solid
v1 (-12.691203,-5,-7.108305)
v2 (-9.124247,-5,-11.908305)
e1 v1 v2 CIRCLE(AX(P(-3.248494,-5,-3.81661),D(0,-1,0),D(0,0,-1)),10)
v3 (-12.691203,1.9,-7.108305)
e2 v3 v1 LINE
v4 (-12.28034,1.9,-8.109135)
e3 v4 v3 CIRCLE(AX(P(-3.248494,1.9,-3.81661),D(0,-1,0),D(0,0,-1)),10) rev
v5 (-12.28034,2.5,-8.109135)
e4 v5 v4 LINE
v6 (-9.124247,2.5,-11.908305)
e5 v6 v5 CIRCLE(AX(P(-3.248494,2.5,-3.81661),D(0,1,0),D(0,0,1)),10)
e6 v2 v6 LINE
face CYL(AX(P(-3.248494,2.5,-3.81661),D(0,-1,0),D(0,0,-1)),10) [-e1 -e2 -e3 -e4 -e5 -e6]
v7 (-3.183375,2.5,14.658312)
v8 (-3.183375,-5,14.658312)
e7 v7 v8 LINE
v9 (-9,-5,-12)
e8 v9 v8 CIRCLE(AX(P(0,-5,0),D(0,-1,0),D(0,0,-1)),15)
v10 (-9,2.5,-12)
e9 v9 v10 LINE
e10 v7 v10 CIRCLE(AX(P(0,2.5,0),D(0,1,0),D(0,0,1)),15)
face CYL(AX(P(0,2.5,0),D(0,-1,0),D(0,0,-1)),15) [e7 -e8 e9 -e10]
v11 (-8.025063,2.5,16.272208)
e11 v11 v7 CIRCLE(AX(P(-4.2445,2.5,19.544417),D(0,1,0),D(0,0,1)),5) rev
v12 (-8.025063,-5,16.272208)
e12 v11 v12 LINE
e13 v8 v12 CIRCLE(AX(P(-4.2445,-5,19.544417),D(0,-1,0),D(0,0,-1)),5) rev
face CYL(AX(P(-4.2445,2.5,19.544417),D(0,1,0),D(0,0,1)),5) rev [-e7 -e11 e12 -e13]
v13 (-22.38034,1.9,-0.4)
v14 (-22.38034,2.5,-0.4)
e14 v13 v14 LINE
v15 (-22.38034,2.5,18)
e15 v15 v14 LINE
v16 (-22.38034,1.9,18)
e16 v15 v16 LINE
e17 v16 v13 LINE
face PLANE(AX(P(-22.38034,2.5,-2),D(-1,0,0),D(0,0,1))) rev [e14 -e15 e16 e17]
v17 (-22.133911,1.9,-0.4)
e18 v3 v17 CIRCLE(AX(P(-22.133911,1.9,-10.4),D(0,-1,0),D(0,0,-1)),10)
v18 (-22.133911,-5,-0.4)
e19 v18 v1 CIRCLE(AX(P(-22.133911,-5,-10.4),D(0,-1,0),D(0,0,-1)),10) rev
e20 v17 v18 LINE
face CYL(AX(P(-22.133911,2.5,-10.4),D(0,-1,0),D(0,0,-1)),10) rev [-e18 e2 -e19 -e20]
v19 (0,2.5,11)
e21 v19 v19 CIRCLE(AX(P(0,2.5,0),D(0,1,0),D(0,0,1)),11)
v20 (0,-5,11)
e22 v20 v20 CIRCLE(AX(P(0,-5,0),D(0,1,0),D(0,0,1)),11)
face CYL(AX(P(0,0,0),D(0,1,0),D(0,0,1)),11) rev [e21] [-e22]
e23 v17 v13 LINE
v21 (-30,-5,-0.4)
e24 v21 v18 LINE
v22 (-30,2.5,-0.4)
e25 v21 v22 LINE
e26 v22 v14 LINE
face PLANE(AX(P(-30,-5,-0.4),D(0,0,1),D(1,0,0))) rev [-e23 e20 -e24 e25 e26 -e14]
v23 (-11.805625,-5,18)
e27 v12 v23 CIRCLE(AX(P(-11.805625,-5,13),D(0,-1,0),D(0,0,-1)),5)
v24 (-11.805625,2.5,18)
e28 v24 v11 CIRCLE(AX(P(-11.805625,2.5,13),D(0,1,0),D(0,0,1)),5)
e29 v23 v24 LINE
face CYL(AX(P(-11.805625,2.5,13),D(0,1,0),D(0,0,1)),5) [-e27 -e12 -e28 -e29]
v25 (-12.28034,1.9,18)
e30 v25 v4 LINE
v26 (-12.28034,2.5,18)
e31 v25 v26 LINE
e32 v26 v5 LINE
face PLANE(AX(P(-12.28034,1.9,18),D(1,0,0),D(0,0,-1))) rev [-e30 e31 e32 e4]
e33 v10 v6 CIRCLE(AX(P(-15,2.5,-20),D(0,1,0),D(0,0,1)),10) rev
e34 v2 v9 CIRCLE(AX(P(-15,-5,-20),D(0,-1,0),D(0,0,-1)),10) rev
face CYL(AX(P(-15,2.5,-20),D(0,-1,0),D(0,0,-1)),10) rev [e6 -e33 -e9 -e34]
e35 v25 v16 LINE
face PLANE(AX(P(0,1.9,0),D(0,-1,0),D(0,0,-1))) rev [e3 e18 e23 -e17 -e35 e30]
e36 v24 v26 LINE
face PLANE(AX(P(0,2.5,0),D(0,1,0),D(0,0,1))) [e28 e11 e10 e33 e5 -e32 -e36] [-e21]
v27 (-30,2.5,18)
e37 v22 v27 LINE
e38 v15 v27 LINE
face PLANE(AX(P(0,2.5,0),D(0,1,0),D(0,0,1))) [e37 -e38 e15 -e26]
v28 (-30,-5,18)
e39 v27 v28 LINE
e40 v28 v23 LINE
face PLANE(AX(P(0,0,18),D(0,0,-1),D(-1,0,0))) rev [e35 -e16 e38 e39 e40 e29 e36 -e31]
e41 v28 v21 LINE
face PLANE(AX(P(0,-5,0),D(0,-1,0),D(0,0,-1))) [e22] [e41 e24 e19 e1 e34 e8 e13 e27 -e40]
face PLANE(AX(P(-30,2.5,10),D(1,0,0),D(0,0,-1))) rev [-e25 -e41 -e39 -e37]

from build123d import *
from build123d.topology import SkipClean

# Parameters (mm, degrees)
BOSS_EXTRUDE1_DEPTH = 2.5
SKETCH2_W           = 10
SKETCH2_H           = 20
CUT_EXTRUDE1_DEPTH  = 0.6
SKETCH4_R           = 11
CUT_EXTRUDE2_DEPTH  = 34.634060118
BOSS_EXTRUDE2_START = 5
SKETCH6_R           = 15
BOSS_EXTRUDE2_DEPTH = 5
SKETCH7_R           = 11
CUT_EXTRUDE3_DEPTH  = 34.911649916
SKETCH8_W           = 18.819660113
SKETCH8_H           = 20
BOSS_EXTRUDE3_DEPTH = 5
FILLET1_R           = 10
BOSS_EXTRUDE4_DEPTH = 8
SKETCH11_W          = 16.12
SKETCH11_H          = 10
CUT_EXTRUDE6_DEPTH  = 10
FILLET2_R           = 10
FILLET3_R           = 10
FILLET4_R           = 5
FILLET5_R           = 5
SKETCH12_W          = 1.6
SKETCH12_H          = 32.071627579
CUT_EXTRUDE7_DEPTH  = 0.6
SKETCH13_W          = 1.5
SKETCH13_H          = 20
BOSS_EXTRUDE5_DEPTH = 0.6
SKETCH14_W          = 17.743382102
SKETCH14_H          = 16.653616468
CUT_EXTRUDE8_DEPTH  = 36.780581326
FILLET6_R           = 10
FILLET7_R           = 10


with BuildPart() as part:
    # Sketch1 → Boss-Extrude1 (new body)
    with BuildSketch(Plane(origin=(0, 0, 0), x_dir=(1, 0, 0), z_dir=(0, 1, 0))):
        with BuildLine():
            Line((-30, -10), (-11.180339887, -10))
            ThreePointArc((-11.180339887, -10), (15, 0), (-11.180339887, 10))
            Line((-11.180339887, 10), (-30, 10))
            Line((-30, 10), (-30, -10))
        make_face()
    extrude(amount=BOSS_EXTRUDE1_DEPTH)

    # Sketch2 → Cut-Extrude1 (cut)
    with BuildSketch(Plane(origin=(0, 2.5, 0), x_dir=(1, 0, 0), z_dir=(0, 1, 0))):
        with Locations((-18.880339887, 0)):
            Rectangle(SKETCH2_W, SKETCH2_H)
    extrude(amount=-CUT_EXTRUDE1_DEPTH, mode=Mode.SUBTRACT)

    # Sketch4 → Cut-Extrude2 (cut, through all)
    with BuildSketch(Plane(origin=(0, 2.5, 0), x_dir=(1, 0, 0), z_dir=(0, 1, 0))):
        with Locations(Location((0, 0, 0), (0, 0, 270))):
            Circle(SKETCH4_R)
    extrude(amount=-CUT_EXTRUDE2_DEPTH, mode=Mode.SUBTRACT)

    # Sketch6 → Boss-Extrude2 (add)
    with SkipClean():  # the faces are left unmerged after this step: merging them gives an invalid solid
        with BuildSketch(Plane.XZ.offset(BOSS_EXTRUDE2_START)):
            with Locations(Location((0, 0, 0), (0, 0, 270))):
                Circle(SKETCH6_R)
        extrude(amount=-BOSS_EXTRUDE2_DEPTH)

    # Sketch7 → Cut-Extrude3 (cut, through all)
    with SkipClean():  # the faces are left unmerged after this step: merging them gives an invalid solid
        with BuildSketch(Plane(origin=(0, 0, 0), x_dir=(1, 0, 0), z_dir=(0, 1, 0))):
            with Locations(Location((0, 0, 0), (0, 0, 270))):
                Circle(SKETCH7_R)
        extrude(amount=-CUT_EXTRUDE3_DEPTH, mode=Mode.SUBTRACT)

    # Sketch8 → Boss-Extrude3 (add)
    with SkipClean():  # the faces are left unmerged after this step: merging them gives an invalid solid
        with BuildSketch(Plane.XZ):
            with Locations((-20.590169944, 0)):
                Rectangle(SKETCH8_W, SKETCH8_H)
        extrude(amount=BOSS_EXTRUDE3_DEPTH)

    # Fillet1
    # the kernel refuses this fillet: 10 mm, written as the material it adds along each edge
    with BuildSketch(Plane(origin=(-11.180339887, 0, -10), x_dir=(-1, 0, 0), z_dir=(0, -1, 0))) as fillet1_piece_1:
        with BuildLine():
            CenterArc((3.819660113, 10), FILLET1_R, 233.130102354, 36.869897646)
            ThreePointArc((-2.180339887, 2), (-1.040737849, 1.053889384), (0, 0))
            Line((0, 0), (3.819660113, 0))
        make_face()
    extrude(amount=5)
    with BuildSketch(Plane(origin=(-11.180339887, 0, 10), x_dir=(0.7369259589108584, 0, 0.6759734692155542), z_dir=(0, -1, 0))) as fillet1_piece_2:
        with BuildLine():
            CenterArc((3.944928001, 9.951248487), FILLET1_R, 227.470208625, 36.869897646)
            Line((-2.814806691, 2.581988897), (0, 0))
            ThreePointArc((0, 0), (1.479348, 0.07312727), (2.958696001, 0))
        make_face()
    extrude(amount=5)
    with BuildSketch(Plane(origin=(-11.180339887, 0, 10), x_dir=(0.7369259589108588, 0, 0.6759734692155539), z_dir=(0, 1, 0))) as fillet1_piece_3_section:
        with BuildLine():
            CenterArc((3.944928001, -9.951248487), FILLET1_R, 95.659893729, 36.869897646)
            Line((-2.814806691, -2.581988897), (0, 0))
            ThreePointArc((0, 0), (1.479348, -0.07312727), (2.958696001, 0))
        make_face()
    fillet1_piece_3 = extrude(amount=2.5, mode=Mode.PRIVATE)
    fillet1_piece_3 = split(fillet1_piece_3, bisect_by=Plane(origin=(-11.180339887, 1.9, 10), z_dir=(0, -1, 0)), keep=Keep.TOP, mode=Mode.PRIVATE)
    fillet1_piece_3 = split(fillet1_piece_3, bisect_by=Plane(origin=(-13.880339887, 0, 10), z_dir=(1, 0, 0)), keep=Keep.TOP, mode=Mode.PRIVATE)
    add(fillet1_piece_3)
    with BuildSketch(Plane(origin=(-11.180339887, 0, 10), x_dir=(0.7369259589108588, 0, 0.6759734692155539), z_dir=(0, 1, 0))) as fillet1_piece_4_section:
        with BuildLine():
            CenterArc((3.944928001, -9.951248487), FILLET1_R, 95.659893729, 36.869897646)
            Line((-2.814806691, -2.581988897), (0, 0))
            ThreePointArc((0, 0), (1.479348, -0.07312727), (2.958696001, 0))
        make_face()
    fillet1_piece_4 = extrude(amount=2.5, mode=Mode.PRIVATE)
    fillet1_piece_4 = split(fillet1_piece_4, bisect_by=Plane(origin=(-11.180339887, 1.9, 10), z_dir=(0, -1, 0)), keep=Keep.TOP, mode=Mode.PRIVATE)
    fillet1_piece_4 = split(fillet1_piece_4, bisect_by=Plane(origin=(-13.880339887, 0, 10), z_dir=(-1, 0, 0)), keep=Keep.TOP, mode=Mode.PRIVATE)
    add(fillet1_piece_4)
    with BuildSketch(Plane(origin=(-11.180339887, 0, 10), x_dir=(0.7369259589108588, 0, 0.6759734692155539), z_dir=(0, 1, 0))) as fillet1_piece_5_section:
        with BuildLine():
            CenterArc((3.944928001, -9.951248487), FILLET1_R, 95.659893729, 36.869897646)
            Line((-2.814806691, -2.581988897), (0, 0))
            ThreePointArc((0, 0), (1.479348, -0.07312727), (2.958696001, 0))
        make_face()
    fillet1_piece_5 = extrude(amount=2.5, mode=Mode.PRIVATE)
    fillet1_piece_5 = split(fillet1_piece_5, bisect_by=Plane(origin=(-11.180339887, 1.9, 10), z_dir=(0, 1, 0)), keep=Keep.TOP, mode=Mode.PRIVATE)
    fillet1_piece_5 = split(fillet1_piece_5, bisect_by=Plane(origin=(-13.880339887, 0, 10), z_dir=(1, 0, 0)), keep=Keep.TOP, mode=Mode.PRIVATE)
    add(fillet1_piece_5)
    with BuildSketch(Plane(origin=(-11.180339887, 0, -10), x_dir=(-1, 0, 0), z_dir=(0, 1, 0))) as fillet1_piece_6_section:
        with BuildLine():
            CenterArc((3.819660113, -10), FILLET1_R, 90, 36.869897646)
            ThreePointArc((-2.180339887, -2), (-1.040737849, -1.053889384), (0, 0))
            Line((0, 0), (3.819660113, 0))
        make_face()
    fillet1_piece_6 = extrude(amount=2.5, mode=Mode.PRIVATE)
    fillet1_piece_6 = split(fillet1_piece_6, bisect_by=Plane(origin=(-11.180339887, 1.9, -10), z_dir=(0, -1, 0)), keep=Keep.TOP, mode=Mode.PRIVATE)
    fillet1_piece_6 = split(fillet1_piece_6, bisect_by=Plane(origin=(-13.880339887, 0, -10), z_dir=(-1, 0, 0)), keep=Keep.TOP, mode=Mode.PRIVATE)
    add(fillet1_piece_6)
    with BuildSketch(Plane(origin=(-11.180339887, 0, -10), x_dir=(-1, 0, 0), z_dir=(0, 1, 0))) as fillet1_piece_7_section:
        with BuildLine():
            CenterArc((3.819660113, -10), FILLET1_R, 90, 36.869897646)
            ThreePointArc((-2.180339887, -2), (-1.040737849, -1.053889384), (0, 0))
            Line((0, 0), (3.819660113, 0))
        make_face()
    fillet1_piece_7 = extrude(amount=2.5, mode=Mode.PRIVATE)
    fillet1_piece_7 = split(fillet1_piece_7, bisect_by=Plane(origin=(-11.180339887, 1.9, -10), z_dir=(0, -1, 0)), keep=Keep.TOP, mode=Mode.PRIVATE)
    fillet1_piece_7 = split(fillet1_piece_7, bisect_by=Plane(origin=(-13.880339887, 0, -10), z_dir=(1, 0, 0)), keep=Keep.TOP, mode=Mode.PRIVATE)
    add(fillet1_piece_7)
    with BuildSketch(Plane(origin=(-11.180339887, 0, -10), x_dir=(-1, 0, 0), z_dir=(0, 1, 0))) as fillet1_piece_8_section:
        with BuildLine():
            CenterArc((3.819660113, -10), FILLET1_R, 90, 36.869897646)
            ThreePointArc((-2.180339887, -2), (-1.040737849, -1.053889384), (0, 0))
            Line((0, 0), (3.819660113, 0))
        make_face()
    fillet1_piece_8 = extrude(amount=2.5, mode=Mode.PRIVATE)
    fillet1_piece_8 = split(fillet1_piece_8, bisect_by=Plane(origin=(-11.180339887, 1.9, -10), z_dir=(0, 1, 0)), keep=Keep.TOP, mode=Mode.PRIVATE)
    fillet1_piece_8 = split(fillet1_piece_8, bisect_by=Plane(origin=(-13.880339887, 0, -10), z_dir=(1, 0, 0)), keep=Keep.TOP, mode=Mode.PRIVATE)
    add(fillet1_piece_8)

    # Sketch10 → Boss-Extrude4 (add)
    with BuildSketch(Plane.XY.offset(10)):
        Polygon((-30, -5), (-30, 2.5), (-23.880339887, 2.5), (-23.880339887, 1.9), (-13.880339887, 1.9), (-13.880339887, 2.5), (-9, 2.5), (-9, -5), align=None)
    extrude(amount=BOSS_EXTRUDE4_DEPTH)

    # Sketch11 → Cut-Extrude6 (cut, symmetric)
    with BuildSketch(Plane(origin=(0, 0, 0), x_dir=(1, 0, 0), z_dir=(0, 1, 0))):
        with Locations((-21.94, 7)):
            Rectangle(SKETCH11_W, SKETCH11_H)
    extrude(amount=CUT_EXTRUDE6_DEPTH, both=True, mode=Mode.SUBTRACT)

    # Fillet2
    fillet2_edges = [part.edges().sort_by_distance(p)[0] for p in [
        (-13.88, -1.25, -10.062917933),
    ]]
    fillet(fillet2_edges, radius=FILLET2_R)

    # Fillet3
    # the kernel refuses this fillet: 10 mm, written as the material it adds along each edge
    with BuildSketch(Plane(origin=(-13.88, -5, -2), x_dir=(0.16934009011749904, 0, -0.9855576765867116), z_dir=(0, 1, 0))) as fillet3_piece_1_section:
        with BuildLine():
            CenterArc((8.493185498, 9.622504823), FILLET3_R, 189.749452729, 64.457385312)
            Line((-1.362391268, 7.929103922), (-2.347948945, 7.759763832))
            Line((-2.347948945, 7.759763832), (-0.985557677, -0.16934009))
            Line((-0.985557677, -0.16934009), (0.16934009, -0.985557677))
            ThreePointArc((0.16934009, -0.985557677), (1.525816528, -0.752485734), (5.499366011, -0.962250482))
            Line((5.499366011, -0.962250482), (5.771531419, 0))
        make_face()
    fillet3_piece_1 = extrude(amount=27.613241747, mode=Mode.PRIVATE)
    fillet3_piece_1 = split(fillet3_piece_1, bisect_by=Plane(origin=(-13.88, 1.9, -2), z_dir=(0, -1, 0)), keep=Keep.TOP, mode=Mode.PRIVATE)
    add(fillet3_piece_1)
    with BuildSketch(Plane(origin=(-13.88, -25.113241747, -2), x_dir=(0.16934009011749904, 0, -0.9855576765867116), z_dir=(0, 1, 0))) as fillet3_piece_2_section:
        with BuildLine():
            CenterArc((8.493185498, 9.622504823), FILLET3_R, 189.749452729, 64.457385312)
            Line((-1.362391268, 7.929103922), (-2.347948945, 7.759763832))
            Line((-2.347948945, 7.759763832), (-0.985557677, -0.16934009))
            Line((-0.985557677, -0.16934009), (0.16934009, -0.985557677))
            ThreePointArc((0.16934009, -0.985557677), (1.525816528, -0.752485734), (5.499366011, -0.962250482))
            Line((5.499366011, -0.962250482), (5.771531419, 0))
        make_face()
    fillet3_piece_2 = extrude(amount=27.613241747, mode=Mode.PRIVATE)
    fillet3_piece_2 = split(fillet3_piece_2, bisect_by=Plane(origin=(-13.880339887, -25.113241747, -2), z_dir=(1, 0, 0)), keep=Keep.TOP, mode=Mode.PRIVATE)
    fillet3_piece_2 = split(fillet3_piece_2, bisect_by=Plane(origin=(-13.88, 1.9, -2), z_dir=(0, 1, 0)), keep=Keep.TOP, mode=Mode.PRIVATE)
    add(fillet3_piece_2)

    # Fillet4
    # the kernel refuses this fillet: 5 mm, written as the material it adds along each edge
    with BuildSketch(Plane(origin=(-9, 0, 12), x_dir=(0, 0, 1), z_dir=(0, -1, 0))) as fillet4_piece_1:
        with BuildLine():
            CenterArc((7.544416527, -4.75549972), FILLET4_R, 107.991946178, 84.260829523)
            Line((2.658312395, -5.81662479), (2.560590313, -5.837847292))
            ThreePointArc((2.560590313, -5.837847292), (1.551800458, -2.806559571), (-0.08, -0.06))
            Line((-0.08, -0.06), (0, 0.1))
            ThreePointArc((0, 0.1), (3, 0.1), (5.969111669, 0.095109994))
            Line((5.969111669, 0.095109994), (6, 0))
        make_face()
    extrude(amount=5)
    with BuildSketch(Plane(origin=(-9, 0, 12), x_dir=(0, 0, 1), z_dir=(0, 1, 0))) as fillet4_piece_2:
        with BuildLine():
            CenterArc((7.544416527, 4.75549972), FILLET4_R, 167.7472243, 84.260829523)
            Line((2.658312395, 5.81662479), (2.560590313, 5.837847292))
            ThreePointArc((2.560590313, 5.837847292), (1.551800458, 2.806559571), (-0.08, 0.06))
            Line((-0.08, 0.06), (0, -0.1))
            ThreePointArc((0, -0.1), (3, -0.1), (5.969111669, -0.095109994))
            Line((5.969111669, -0.095109994), (6, 0))
        make_face()
    extrude(amount=2.5)

    # Fillet5
    # the kernel refuses this fillet: 5 mm, written as the material it takes off along each edge
    with BuildSketch(Plane(origin=(-9, 9.514063374, 18), x_dir=(0.49143032961767363, 0, -0.8709168910589946), z_dir=(0, -1, 0))) as fillet5_piece_1:
        with BuildLine():
            CenterArc((2.975815065, -4.900618155), FILLET5_R, 101.442690238, 49.122673346)
            Line((-1.37876939, -2.443466507), (0, 0))
            ThreePointArc((0, 0), (0.991938355, -0.099381845), (1.98387671, 0))
        make_face()
    extrude(amount=21.528126747, mode=Mode.SUBTRACT)

    # Sketch12 → Cut-Extrude7 (cut)
    with BuildSketch(Plane(origin=(0, 2.5, 0), x_dir=(1, 0, 0), z_dir=(0, 1, 0))):
        with Locations((-13.080339887, -1.96418621)):
            Rectangle(SKETCH12_W, SKETCH12_H)
    extrude(amount=-CUT_EXTRUDE7_DEPTH, mode=Mode.SUBTRACT)

    # Sketch13 → Boss-Extrude5 (add)
    with BuildSketch(Plane(origin=(0, 1.9, 0), x_dir=(1, 0, 0), z_dir=(0, 1, 0))):
        with Locations((-23.130339887, -8)):
            Rectangle(SKETCH13_W, SKETCH13_H)
    extrude(amount=BOSS_EXTRUDE5_DEPTH)

    # Sketch14 → Cut-Extrude8 (cut, through all)
    with BuildSketch(Plane(origin=(0, 2.5, 0), x_dir=(1, 0, 0), z_dir=(0, 1, 0))):
        with Locations((-21.128308949, 8.726808234)):
            Rectangle(SKETCH14_W, SKETCH14_H)
    extrude(amount=-CUT_EXTRUDE8_DEPTH, mode=Mode.SUBTRACT)

    # Fillet6
    # the kernel refuses this fillet: 10 mm, written as the material it adds along each edge
    with BuildSketch(Plane(origin=(-12.256617898, 2.5, -0.4), x_dir=(0, 0, -1), z_dir=(0, -1, 0))) as fillet6_piece_1_section:
        with BuildLine():
            CenterArc((10, -9.877293528), FILLET6_R, 98.984966406, 81.015033594)
            Line((0, -9.877293528), (0, 0))
            Line((0, 0), (8.438246956, 0))
        make_face()
    fillet6_piece_1 = extrude(amount=7.5, mode=Mode.PRIVATE)
    fillet6_piece_1 = split(fillet6_piece_1, bisect_by=Plane(origin=(-12.280339887, 2.5, -0.4), z_dir=(1, 0, 0)), keep=Keep.TOP, mode=Mode.PRIVATE)
    add(fillet6_piece_1)
    with BuildSketch(Plane(origin=(-12.256617898, 27.193233819, -0.4), x_dir=(0, 0, -1), z_dir=(0, -1, 0))) as fillet6_piece_2_section:
        with BuildLine():
            CenterArc((10, -9.877293528), FILLET6_R, 98.984966406, 81.015033594)
            Line((0, -9.877293528), (0, 0))
            Line((0, 0), (8.438246956, 0))
        make_face()
    fillet6_piece_2 = extrude(amount=32.193233819, mode=Mode.PRIVATE)
    fillet6_piece_2 = split(fillet6_piece_2, bisect_by=Plane(origin=(-12.256617898, 1.9, -0.4), z_dir=(0, -1, 0)), keep=Keep.TOP, mode=Mode.PRIVATE)
    add(fillet6_piece_2)

    # Fillet7
    # the kernel refuses this fillet: 10 mm, written as the material it takes off along each edge
    with BuildSketch(Plane(origin=(-12.256617898, 13.465001661, -8.838246956), x_dir=(-0.24364329943227025, -7.330652331656778e-15, 0.9698649094805714), z_dir=(0, -1, 0))) as fillet7_piece_1:
        with BuildLine():
            CenterArc((2.675540731, -9.960151058), FILLET7_R, 95.11670471, 34.796493554)
            Line((-3.740722604, -2.289977342), (-4.382348937, -1.522959971))
            ThreePointArc((-4.382348937, -1.522959971), (-4.120966176, -1.295615595), (-0.325639131, 0.945494133))
            Line((-0.325639131, 0.945494133), (0.089184691, 0.996015106))
            ThreePointArc((0.089184691, 0.996015106), (0.89184691, 0.960151058), (1.69450913, 0.996015106))
            Line((1.69450913, 0.996015106), (1.783693821, 0))
        make_face()
    extrude(amount=29.430003321, mode=Mode.SUBTRACT)


solid = part.part
